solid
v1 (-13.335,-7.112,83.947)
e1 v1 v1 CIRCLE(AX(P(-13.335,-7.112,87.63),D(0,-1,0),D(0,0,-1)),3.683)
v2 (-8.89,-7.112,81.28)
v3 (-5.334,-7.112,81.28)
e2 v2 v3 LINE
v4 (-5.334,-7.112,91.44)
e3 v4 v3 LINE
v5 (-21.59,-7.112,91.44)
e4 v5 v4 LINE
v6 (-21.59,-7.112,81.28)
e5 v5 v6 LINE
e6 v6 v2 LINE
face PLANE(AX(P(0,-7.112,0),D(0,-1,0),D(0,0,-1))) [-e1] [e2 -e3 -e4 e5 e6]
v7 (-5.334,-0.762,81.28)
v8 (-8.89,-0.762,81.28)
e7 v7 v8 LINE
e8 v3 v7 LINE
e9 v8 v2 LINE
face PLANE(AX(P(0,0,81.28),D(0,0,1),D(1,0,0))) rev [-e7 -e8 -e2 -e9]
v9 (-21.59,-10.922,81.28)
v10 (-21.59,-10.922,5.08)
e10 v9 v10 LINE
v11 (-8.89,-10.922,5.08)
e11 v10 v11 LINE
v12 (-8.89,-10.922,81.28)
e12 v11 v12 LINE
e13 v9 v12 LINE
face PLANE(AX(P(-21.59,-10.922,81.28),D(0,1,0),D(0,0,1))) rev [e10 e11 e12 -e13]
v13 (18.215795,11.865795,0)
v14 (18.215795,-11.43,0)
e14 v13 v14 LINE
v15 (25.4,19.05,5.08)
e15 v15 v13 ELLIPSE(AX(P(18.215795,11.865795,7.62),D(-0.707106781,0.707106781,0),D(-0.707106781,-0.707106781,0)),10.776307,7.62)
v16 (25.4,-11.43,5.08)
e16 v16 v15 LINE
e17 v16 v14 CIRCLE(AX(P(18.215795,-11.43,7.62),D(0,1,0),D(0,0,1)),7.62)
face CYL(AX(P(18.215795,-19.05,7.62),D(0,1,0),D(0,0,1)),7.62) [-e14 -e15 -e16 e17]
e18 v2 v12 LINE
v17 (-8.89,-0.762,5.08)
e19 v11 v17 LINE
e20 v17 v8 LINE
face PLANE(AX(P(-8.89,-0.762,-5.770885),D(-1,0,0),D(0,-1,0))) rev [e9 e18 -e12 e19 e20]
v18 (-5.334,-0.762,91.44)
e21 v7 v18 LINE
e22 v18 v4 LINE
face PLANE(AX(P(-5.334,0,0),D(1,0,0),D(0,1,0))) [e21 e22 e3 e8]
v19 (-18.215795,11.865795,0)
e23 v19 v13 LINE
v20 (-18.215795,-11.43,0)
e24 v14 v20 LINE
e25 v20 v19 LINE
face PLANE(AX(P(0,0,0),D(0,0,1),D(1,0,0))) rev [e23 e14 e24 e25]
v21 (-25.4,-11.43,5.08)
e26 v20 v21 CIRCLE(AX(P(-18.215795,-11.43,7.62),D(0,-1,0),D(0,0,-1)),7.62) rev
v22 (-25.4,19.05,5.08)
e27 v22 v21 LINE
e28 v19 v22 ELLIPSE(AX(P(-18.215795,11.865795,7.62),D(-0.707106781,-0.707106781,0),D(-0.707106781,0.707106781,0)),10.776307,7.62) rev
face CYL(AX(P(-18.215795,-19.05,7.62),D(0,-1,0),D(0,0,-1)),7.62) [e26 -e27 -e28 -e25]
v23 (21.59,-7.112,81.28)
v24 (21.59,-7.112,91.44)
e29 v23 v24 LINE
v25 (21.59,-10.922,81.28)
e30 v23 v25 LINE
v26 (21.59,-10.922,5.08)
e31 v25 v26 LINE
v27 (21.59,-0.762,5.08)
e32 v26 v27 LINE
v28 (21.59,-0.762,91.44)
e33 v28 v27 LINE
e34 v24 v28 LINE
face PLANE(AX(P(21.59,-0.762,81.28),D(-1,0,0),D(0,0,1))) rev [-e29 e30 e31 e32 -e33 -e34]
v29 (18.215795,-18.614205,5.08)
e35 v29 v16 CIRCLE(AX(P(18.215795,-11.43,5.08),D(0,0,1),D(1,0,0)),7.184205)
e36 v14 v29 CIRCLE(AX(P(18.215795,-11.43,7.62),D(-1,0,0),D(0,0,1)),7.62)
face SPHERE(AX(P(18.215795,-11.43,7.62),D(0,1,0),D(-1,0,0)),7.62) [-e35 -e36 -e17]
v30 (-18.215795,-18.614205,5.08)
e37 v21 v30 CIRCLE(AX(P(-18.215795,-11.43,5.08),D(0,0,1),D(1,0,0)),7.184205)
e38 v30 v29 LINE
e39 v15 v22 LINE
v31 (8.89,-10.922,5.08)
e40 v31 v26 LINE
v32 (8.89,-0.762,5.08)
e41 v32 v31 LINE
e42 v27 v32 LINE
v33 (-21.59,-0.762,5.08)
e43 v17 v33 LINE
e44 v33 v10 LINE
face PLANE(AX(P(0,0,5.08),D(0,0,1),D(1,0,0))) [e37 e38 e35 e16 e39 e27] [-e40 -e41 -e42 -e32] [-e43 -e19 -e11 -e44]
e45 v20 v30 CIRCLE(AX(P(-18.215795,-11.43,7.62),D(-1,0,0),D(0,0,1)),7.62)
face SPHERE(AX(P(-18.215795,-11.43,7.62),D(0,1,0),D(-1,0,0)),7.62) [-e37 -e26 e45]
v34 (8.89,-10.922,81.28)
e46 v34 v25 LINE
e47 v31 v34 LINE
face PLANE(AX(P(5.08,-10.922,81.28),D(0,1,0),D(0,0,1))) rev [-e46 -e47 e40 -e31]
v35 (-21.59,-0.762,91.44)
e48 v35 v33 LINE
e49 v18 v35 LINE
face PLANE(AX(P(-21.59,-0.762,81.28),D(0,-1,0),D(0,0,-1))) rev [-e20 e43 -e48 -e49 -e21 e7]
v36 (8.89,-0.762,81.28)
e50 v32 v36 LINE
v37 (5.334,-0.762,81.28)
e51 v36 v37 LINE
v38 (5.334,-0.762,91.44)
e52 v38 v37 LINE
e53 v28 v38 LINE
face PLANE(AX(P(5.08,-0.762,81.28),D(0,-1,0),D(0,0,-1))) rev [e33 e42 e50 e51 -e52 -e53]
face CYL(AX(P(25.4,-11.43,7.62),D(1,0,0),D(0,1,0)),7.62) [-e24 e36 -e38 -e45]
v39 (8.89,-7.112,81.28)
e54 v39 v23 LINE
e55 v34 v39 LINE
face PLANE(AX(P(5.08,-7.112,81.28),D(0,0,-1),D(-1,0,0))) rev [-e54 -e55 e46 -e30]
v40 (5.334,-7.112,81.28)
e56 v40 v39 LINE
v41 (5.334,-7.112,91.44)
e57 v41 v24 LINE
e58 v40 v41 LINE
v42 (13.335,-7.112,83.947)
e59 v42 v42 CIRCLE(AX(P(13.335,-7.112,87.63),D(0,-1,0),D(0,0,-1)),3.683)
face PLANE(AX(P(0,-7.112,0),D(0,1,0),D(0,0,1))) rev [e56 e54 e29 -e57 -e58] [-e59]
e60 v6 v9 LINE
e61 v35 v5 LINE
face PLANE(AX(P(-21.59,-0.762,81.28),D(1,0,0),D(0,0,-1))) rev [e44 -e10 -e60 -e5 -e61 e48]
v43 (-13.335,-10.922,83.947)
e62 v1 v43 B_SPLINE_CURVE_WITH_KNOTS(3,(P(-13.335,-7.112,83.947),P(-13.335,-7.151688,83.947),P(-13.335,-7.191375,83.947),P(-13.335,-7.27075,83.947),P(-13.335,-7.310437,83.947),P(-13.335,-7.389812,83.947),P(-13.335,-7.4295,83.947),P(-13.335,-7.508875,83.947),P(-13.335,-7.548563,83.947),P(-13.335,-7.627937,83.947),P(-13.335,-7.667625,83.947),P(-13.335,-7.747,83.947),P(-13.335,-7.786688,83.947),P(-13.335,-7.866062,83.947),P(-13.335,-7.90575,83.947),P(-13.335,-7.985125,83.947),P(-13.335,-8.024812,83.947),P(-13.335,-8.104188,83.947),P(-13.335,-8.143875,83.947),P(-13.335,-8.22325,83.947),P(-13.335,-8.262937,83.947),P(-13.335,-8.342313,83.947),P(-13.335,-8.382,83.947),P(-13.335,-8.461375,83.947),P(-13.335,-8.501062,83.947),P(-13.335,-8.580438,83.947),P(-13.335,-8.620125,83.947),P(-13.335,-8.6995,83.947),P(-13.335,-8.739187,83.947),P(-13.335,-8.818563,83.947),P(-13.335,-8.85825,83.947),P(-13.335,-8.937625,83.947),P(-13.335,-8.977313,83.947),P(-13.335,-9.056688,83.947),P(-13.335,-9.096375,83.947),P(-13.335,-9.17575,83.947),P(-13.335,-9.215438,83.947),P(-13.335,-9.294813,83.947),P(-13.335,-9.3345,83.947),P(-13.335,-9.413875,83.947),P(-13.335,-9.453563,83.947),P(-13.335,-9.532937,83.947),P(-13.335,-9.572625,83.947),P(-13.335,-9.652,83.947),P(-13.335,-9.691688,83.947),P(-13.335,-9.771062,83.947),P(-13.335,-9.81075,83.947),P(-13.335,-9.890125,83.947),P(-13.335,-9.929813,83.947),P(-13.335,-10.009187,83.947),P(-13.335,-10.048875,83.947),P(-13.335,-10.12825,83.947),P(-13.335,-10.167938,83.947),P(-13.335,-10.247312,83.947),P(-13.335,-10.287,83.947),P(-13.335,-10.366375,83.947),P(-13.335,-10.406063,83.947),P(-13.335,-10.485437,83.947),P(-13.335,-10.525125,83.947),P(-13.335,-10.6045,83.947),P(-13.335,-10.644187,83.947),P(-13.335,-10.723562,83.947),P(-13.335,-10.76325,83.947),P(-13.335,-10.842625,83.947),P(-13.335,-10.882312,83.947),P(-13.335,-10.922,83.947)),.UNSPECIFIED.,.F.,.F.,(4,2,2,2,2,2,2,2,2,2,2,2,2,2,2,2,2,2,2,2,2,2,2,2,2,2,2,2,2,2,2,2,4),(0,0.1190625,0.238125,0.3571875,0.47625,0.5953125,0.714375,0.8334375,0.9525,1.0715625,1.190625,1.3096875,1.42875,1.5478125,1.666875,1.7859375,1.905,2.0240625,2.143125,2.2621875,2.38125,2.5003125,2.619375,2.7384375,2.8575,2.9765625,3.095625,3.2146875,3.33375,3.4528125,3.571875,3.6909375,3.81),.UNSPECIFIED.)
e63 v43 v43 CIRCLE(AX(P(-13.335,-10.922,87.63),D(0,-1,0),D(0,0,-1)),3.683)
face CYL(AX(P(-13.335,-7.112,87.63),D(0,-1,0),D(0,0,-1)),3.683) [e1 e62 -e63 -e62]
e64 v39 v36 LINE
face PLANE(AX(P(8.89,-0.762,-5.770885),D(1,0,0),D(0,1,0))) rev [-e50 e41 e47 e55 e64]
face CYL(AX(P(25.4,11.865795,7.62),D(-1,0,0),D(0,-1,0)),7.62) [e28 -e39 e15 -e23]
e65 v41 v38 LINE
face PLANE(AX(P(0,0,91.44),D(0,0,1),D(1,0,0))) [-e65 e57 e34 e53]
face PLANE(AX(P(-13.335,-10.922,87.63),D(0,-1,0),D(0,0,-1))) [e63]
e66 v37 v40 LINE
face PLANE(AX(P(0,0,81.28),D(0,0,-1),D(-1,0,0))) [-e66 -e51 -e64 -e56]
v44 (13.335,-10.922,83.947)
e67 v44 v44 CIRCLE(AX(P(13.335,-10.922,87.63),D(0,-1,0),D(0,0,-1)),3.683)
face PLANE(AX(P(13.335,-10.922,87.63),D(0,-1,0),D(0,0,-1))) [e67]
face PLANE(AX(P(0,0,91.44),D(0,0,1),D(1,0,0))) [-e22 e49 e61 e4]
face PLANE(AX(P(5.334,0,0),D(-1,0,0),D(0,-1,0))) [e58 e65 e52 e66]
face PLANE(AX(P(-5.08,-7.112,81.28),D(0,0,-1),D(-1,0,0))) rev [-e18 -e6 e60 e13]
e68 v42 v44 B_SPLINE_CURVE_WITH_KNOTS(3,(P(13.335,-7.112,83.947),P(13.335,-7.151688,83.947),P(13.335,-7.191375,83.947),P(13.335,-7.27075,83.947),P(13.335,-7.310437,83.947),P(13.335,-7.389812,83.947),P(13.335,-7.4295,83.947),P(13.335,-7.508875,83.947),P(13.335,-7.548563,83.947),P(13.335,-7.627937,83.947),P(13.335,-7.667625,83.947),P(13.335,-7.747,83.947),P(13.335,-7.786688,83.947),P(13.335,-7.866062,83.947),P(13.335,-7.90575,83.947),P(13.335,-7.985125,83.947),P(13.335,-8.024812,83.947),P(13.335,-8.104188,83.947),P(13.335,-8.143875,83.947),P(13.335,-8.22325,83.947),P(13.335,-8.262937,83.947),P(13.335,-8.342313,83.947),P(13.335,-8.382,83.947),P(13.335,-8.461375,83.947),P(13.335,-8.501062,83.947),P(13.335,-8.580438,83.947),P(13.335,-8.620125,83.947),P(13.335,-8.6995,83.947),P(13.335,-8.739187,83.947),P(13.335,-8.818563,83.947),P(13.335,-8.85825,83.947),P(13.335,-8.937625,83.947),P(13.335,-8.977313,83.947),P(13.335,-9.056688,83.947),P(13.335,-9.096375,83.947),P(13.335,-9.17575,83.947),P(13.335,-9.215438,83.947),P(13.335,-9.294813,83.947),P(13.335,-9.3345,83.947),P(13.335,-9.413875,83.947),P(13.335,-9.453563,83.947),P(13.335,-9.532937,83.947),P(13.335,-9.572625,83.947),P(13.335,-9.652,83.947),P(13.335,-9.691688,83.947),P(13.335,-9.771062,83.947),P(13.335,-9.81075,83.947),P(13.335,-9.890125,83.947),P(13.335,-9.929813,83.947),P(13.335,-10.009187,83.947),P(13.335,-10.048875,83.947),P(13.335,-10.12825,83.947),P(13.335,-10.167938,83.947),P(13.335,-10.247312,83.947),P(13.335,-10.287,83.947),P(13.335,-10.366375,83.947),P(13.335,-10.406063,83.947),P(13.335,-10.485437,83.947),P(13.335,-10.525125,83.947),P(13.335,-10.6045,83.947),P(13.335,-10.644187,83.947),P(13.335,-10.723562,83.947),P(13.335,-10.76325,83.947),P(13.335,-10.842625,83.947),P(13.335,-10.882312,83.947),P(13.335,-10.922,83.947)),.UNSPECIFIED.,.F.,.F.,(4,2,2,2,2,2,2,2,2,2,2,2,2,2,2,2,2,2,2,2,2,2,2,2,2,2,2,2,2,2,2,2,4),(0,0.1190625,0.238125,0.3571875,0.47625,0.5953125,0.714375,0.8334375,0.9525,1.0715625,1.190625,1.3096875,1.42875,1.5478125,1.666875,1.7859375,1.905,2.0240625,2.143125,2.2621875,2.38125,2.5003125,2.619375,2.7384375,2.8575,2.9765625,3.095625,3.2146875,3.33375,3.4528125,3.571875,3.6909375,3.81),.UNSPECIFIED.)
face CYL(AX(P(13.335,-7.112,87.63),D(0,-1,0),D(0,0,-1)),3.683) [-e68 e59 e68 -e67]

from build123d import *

# Parameters (mm, degrees)
SKETCH1_W             = 50.8
SKETCH1_H             = 38.1
BOSS_EXTRUDE1_DEPTH   = 5.08
SKETCH2_W             = 16.51
SKETCH2_H             = 10.16
BOSS_EXTRUDE2_DEPTH   = 76.2
SKETCH3_W             = 3.81
SKETCH3_H             = 10.16
CUT_EXTRUDE1_DEPTH    = 76.2
SKETCH4_W             = 16.51
SKETCH4_H             = 10.16
BOSS_EXTRUDE3_DEPTH   = 12.7
SKETCH6_W             = 16.51
SKETCH6_H             = 12.7
CUT_EXTRUDE2_DEPTH    = 3.81
SKETCH5_R             = 3.683
BOSS_EXTRUDE4_DEPTH   = 3.81
FILLET1_R             = 7.62
FILLET4_R             = 7.62
FILLET7_R             = 7.62
SKETCH7_W             = 16.51
SKETCH7_H             = 6.35
LEDGE_REDUCTION_DEPTH = 2.54
SKETCH8_W             = 10.16
SKETCH8_H             = 6.35
CUT_EXTRUDE4_DEPTH    = 0.254
SKETCH9_W             = 10.16
SKETCH9_H             = 6.35
CUT_EXTRUDE5_DEPTH    = 0.254


with BuildPart() as part:
    # Sketch1 → Boss-Extrude1 (new body)
    with BuildSketch(Plane.XY):
        Rectangle(SKETCH1_W, SKETCH1_H)
    extrude(amount=BOSS_EXTRUDE1_DEPTH)

    # Sketch2 → Boss-Extrude2 (add)
    with BuildSketch(Plane.XY.offset(5.08)):
        with Locations((-13.335, -5.842)):
            Rectangle(SKETCH2_W, SKETCH2_H)
        with Locations((13.335, -5.842)):
            Rectangle(SKETCH2_W, SKETCH2_H)
    extrude(amount=BOSS_EXTRUDE2_DEPTH)

    # Sketch3 → Cut-Extrude1 (cut)
    with BuildSketch(Plane.XY.offset(81.28)):
        with Locations((-6.985, -5.842)):
            Rectangle(SKETCH3_W, SKETCH3_H)
        with Locations((6.985, -5.842)):
            Rectangle(SKETCH3_W, SKETCH3_H)
    extrude(amount=-CUT_EXTRUDE1_DEPTH, mode=Mode.SUBTRACT)

    # Sketch4 → Boss-Extrude3 (add)
    with BuildSketch(Plane.XY.offset(81.28)):
        with Locations((-13.335, -5.842)):
            Rectangle(SKETCH4_W, SKETCH4_H)
        with Locations((13.335, -5.842)):
            Rectangle(SKETCH4_W, SKETCH4_H)
    extrude(amount=BOSS_EXTRUDE3_DEPTH)

    # Sketch6 → Cut-Extrude2 (cut)
    with BuildSketch(Plane.XZ.offset(10.922)):
        with Locations((-13.335, 87.63)):
            Rectangle(SKETCH6_W, SKETCH6_H)
        with Locations((13.335, 87.63)):
            Rectangle(SKETCH6_W, SKETCH6_H)
    extrude(amount=-CUT_EXTRUDE2_DEPTH, mode=Mode.SUBTRACT)

    # Sketch5 → Boss-Extrude4 (add)
    with BuildSketch(Plane.XZ.offset(10.922)):
        with Locations(Location((-13.335, 87.63, 0), (0, 0, 270))):
            Circle(SKETCH5_R)
        with Locations(Location((13.335, 87.63, 0), (0, 0, 270))):
            Circle(SKETCH5_R)
    extrude(amount=-BOSS_EXTRUDE4_DEPTH)

    # Fillet1
    # the kernel refuses this fillet: 7.62 mm, written as the material it takes off along each edge
    with BuildSketch(Plane(origin=(-43.360512242, 19.05, 0), x_dir=(0, -1, 0), z_dir=(1, 0, 0))) as fillet1_piece_1:
        with BuildLine():
            CenterArc((7.184204897, -7.62), FILLET1_R, 90, 70.528779366)
            Line((0, -5.08), (-0.143684098, -5.0292))
            ThreePointArc((-0.143684098, -5.0292), (-0.1524, -2.54), (-0.1524, 0))
            Line((-0.1524, 0), (0, 0.1524))
            Line((0, 0.1524), (7.184204897, 0.1524))
            Line((7.184204897, 0.1524), (7.184204897, 0))
        make_face()
    extrude(amount=86.721024484, mode=Mode.SUBTRACT)

    # Fillet4
    # the kernel refuses this fillet: 7.62 mm, written as the material it takes off along each edge
    with BuildSketch(Plane(origin=(-25.4, -37.010512242, 0), x_dir=(0, 0, 1), z_dir=(0, 1, 0)), Plane(origin=(25.4, 29.826307345, 0), x_dir=(0, 0, 1), z_dir=(0, -1, 0))) as fillet4_piece_1:
        with BuildLine():
            CenterArc((7.62, 7.184204897), FILLET4_R, 180, 70.528779366)
            Line((0, 7.184204897), (-0.1524, 7.184204897))
            Line((-0.1524, 7.184204897), (-0.1524, 0))
            Line((-0.1524, 0), (0, -0.1524))
            ThreePointArc((0, -0.1524), (2.54, -0.1524), (5.0292, -0.143684098))
            Line((5.0292, -0.143684098), (5.08, 0))
        make_face()
    extrude(amount=66.836819587, mode=Mode.SUBTRACT)

    # Fillet7
    # the kernel refuses this fillet: 7.62 mm, written as the material it takes off along each edge
    with BuildSketch(Plane(origin=(-18.215795103, -19.05, 7.62), x_dir=(0.5563472554155052, 0, 0.8309498970405103), z_dir=(0.8309498970405103, 0, -0.5563472554155052))) as fillet7_piece_1:
        with BuildLine():
            CenterArc((7.62 - FILLET7_R, -FILLET7_R), FILLET7_R, 0, 90)
            Line((7.62, -FILLET7_R), (7.62, 0))
            Line((7.62, 0), (7.62 - FILLET7_R, 0))
        make_face()
    revolve(axis=Axis((-18.215795103, -19.05, 7.62), (0, -1, 0)), revolution_arc=213.803560609, mode=Mode.SUBTRACT)
    with BuildSketch(Plane(origin=(18.215795103, -19.05, 7.62), x_dir=(-0.5563472554155037, 0, 0.8309498970405114), z_dir=(-0.8309498970405114, 0, -0.5563472554155037))) as fillet7_piece_2:
        with BuildLine():
            CenterArc((7.62 - FILLET7_R, FILLET7_R), FILLET7_R, 270, 90)
            Line((7.62, FILLET7_R), (7.62, 0))
            Line((7.62, 0), (7.62 - FILLET7_R, 0))
        make_face()
    revolve(axis=Axis((18.215795103, -19.05, 7.62), (0, 1, 0)), revolution_arc=213.803560609, mode=Mode.SUBTRACT)
    with BuildSketch(Plane(origin=(18.215795103, -19.05, 0), x_dir=(0, 0, 1), z_dir=(-1, 0, 0))) as fillet7_piece_3:
        with BuildLine():
            CenterArc((FILLET7_R, FILLET7_R), FILLET7_R, 180, 90)
            Line((0, FILLET7_R), (0, 0))
            Line((0, 0), (FILLET7_R, 0))
        make_face()
    extrude(amount=36.431590206, mode=Mode.SUBTRACT)

    # Sketch7 → ledge-reduction (cut)
    with BuildSketch(Plane.XY.offset(93.98)):
        with Locations((-13.335, -3.937)):
            Rectangle(SKETCH7_W, SKETCH7_H)
        with Locations((13.335, -3.937)):
            Rectangle(SKETCH7_W, SKETCH7_H)
    extrude(amount=-LEDGE_REDUCTION_DEPTH, mode=Mode.SUBTRACT)

    # Sketch8 → Cut-Extrude4 (cut)
    with BuildSketch(Plane.ZY.offset(-5.08)):
        with Locations((86.36, -3.937)):
            Rectangle(SKETCH8_W, SKETCH8_H)
    extrude(amount=-CUT_EXTRUDE4_DEPTH, mode=Mode.SUBTRACT)

    # Sketch9 → Cut-Extrude5 (cut)
    with BuildSketch(Plane(origin=(-5.08, 0, 0), x_dir=(0, 0, -1), z_dir=(1, 0, 0))):
        with Locations((-86.36, -3.937)):
            Rectangle(SKETCH9_W, SKETCH9_H)
    extrude(amount=-CUT_EXTRUDE5_DEPTH, mode=Mode.SUBTRACT)


solid = part.part
